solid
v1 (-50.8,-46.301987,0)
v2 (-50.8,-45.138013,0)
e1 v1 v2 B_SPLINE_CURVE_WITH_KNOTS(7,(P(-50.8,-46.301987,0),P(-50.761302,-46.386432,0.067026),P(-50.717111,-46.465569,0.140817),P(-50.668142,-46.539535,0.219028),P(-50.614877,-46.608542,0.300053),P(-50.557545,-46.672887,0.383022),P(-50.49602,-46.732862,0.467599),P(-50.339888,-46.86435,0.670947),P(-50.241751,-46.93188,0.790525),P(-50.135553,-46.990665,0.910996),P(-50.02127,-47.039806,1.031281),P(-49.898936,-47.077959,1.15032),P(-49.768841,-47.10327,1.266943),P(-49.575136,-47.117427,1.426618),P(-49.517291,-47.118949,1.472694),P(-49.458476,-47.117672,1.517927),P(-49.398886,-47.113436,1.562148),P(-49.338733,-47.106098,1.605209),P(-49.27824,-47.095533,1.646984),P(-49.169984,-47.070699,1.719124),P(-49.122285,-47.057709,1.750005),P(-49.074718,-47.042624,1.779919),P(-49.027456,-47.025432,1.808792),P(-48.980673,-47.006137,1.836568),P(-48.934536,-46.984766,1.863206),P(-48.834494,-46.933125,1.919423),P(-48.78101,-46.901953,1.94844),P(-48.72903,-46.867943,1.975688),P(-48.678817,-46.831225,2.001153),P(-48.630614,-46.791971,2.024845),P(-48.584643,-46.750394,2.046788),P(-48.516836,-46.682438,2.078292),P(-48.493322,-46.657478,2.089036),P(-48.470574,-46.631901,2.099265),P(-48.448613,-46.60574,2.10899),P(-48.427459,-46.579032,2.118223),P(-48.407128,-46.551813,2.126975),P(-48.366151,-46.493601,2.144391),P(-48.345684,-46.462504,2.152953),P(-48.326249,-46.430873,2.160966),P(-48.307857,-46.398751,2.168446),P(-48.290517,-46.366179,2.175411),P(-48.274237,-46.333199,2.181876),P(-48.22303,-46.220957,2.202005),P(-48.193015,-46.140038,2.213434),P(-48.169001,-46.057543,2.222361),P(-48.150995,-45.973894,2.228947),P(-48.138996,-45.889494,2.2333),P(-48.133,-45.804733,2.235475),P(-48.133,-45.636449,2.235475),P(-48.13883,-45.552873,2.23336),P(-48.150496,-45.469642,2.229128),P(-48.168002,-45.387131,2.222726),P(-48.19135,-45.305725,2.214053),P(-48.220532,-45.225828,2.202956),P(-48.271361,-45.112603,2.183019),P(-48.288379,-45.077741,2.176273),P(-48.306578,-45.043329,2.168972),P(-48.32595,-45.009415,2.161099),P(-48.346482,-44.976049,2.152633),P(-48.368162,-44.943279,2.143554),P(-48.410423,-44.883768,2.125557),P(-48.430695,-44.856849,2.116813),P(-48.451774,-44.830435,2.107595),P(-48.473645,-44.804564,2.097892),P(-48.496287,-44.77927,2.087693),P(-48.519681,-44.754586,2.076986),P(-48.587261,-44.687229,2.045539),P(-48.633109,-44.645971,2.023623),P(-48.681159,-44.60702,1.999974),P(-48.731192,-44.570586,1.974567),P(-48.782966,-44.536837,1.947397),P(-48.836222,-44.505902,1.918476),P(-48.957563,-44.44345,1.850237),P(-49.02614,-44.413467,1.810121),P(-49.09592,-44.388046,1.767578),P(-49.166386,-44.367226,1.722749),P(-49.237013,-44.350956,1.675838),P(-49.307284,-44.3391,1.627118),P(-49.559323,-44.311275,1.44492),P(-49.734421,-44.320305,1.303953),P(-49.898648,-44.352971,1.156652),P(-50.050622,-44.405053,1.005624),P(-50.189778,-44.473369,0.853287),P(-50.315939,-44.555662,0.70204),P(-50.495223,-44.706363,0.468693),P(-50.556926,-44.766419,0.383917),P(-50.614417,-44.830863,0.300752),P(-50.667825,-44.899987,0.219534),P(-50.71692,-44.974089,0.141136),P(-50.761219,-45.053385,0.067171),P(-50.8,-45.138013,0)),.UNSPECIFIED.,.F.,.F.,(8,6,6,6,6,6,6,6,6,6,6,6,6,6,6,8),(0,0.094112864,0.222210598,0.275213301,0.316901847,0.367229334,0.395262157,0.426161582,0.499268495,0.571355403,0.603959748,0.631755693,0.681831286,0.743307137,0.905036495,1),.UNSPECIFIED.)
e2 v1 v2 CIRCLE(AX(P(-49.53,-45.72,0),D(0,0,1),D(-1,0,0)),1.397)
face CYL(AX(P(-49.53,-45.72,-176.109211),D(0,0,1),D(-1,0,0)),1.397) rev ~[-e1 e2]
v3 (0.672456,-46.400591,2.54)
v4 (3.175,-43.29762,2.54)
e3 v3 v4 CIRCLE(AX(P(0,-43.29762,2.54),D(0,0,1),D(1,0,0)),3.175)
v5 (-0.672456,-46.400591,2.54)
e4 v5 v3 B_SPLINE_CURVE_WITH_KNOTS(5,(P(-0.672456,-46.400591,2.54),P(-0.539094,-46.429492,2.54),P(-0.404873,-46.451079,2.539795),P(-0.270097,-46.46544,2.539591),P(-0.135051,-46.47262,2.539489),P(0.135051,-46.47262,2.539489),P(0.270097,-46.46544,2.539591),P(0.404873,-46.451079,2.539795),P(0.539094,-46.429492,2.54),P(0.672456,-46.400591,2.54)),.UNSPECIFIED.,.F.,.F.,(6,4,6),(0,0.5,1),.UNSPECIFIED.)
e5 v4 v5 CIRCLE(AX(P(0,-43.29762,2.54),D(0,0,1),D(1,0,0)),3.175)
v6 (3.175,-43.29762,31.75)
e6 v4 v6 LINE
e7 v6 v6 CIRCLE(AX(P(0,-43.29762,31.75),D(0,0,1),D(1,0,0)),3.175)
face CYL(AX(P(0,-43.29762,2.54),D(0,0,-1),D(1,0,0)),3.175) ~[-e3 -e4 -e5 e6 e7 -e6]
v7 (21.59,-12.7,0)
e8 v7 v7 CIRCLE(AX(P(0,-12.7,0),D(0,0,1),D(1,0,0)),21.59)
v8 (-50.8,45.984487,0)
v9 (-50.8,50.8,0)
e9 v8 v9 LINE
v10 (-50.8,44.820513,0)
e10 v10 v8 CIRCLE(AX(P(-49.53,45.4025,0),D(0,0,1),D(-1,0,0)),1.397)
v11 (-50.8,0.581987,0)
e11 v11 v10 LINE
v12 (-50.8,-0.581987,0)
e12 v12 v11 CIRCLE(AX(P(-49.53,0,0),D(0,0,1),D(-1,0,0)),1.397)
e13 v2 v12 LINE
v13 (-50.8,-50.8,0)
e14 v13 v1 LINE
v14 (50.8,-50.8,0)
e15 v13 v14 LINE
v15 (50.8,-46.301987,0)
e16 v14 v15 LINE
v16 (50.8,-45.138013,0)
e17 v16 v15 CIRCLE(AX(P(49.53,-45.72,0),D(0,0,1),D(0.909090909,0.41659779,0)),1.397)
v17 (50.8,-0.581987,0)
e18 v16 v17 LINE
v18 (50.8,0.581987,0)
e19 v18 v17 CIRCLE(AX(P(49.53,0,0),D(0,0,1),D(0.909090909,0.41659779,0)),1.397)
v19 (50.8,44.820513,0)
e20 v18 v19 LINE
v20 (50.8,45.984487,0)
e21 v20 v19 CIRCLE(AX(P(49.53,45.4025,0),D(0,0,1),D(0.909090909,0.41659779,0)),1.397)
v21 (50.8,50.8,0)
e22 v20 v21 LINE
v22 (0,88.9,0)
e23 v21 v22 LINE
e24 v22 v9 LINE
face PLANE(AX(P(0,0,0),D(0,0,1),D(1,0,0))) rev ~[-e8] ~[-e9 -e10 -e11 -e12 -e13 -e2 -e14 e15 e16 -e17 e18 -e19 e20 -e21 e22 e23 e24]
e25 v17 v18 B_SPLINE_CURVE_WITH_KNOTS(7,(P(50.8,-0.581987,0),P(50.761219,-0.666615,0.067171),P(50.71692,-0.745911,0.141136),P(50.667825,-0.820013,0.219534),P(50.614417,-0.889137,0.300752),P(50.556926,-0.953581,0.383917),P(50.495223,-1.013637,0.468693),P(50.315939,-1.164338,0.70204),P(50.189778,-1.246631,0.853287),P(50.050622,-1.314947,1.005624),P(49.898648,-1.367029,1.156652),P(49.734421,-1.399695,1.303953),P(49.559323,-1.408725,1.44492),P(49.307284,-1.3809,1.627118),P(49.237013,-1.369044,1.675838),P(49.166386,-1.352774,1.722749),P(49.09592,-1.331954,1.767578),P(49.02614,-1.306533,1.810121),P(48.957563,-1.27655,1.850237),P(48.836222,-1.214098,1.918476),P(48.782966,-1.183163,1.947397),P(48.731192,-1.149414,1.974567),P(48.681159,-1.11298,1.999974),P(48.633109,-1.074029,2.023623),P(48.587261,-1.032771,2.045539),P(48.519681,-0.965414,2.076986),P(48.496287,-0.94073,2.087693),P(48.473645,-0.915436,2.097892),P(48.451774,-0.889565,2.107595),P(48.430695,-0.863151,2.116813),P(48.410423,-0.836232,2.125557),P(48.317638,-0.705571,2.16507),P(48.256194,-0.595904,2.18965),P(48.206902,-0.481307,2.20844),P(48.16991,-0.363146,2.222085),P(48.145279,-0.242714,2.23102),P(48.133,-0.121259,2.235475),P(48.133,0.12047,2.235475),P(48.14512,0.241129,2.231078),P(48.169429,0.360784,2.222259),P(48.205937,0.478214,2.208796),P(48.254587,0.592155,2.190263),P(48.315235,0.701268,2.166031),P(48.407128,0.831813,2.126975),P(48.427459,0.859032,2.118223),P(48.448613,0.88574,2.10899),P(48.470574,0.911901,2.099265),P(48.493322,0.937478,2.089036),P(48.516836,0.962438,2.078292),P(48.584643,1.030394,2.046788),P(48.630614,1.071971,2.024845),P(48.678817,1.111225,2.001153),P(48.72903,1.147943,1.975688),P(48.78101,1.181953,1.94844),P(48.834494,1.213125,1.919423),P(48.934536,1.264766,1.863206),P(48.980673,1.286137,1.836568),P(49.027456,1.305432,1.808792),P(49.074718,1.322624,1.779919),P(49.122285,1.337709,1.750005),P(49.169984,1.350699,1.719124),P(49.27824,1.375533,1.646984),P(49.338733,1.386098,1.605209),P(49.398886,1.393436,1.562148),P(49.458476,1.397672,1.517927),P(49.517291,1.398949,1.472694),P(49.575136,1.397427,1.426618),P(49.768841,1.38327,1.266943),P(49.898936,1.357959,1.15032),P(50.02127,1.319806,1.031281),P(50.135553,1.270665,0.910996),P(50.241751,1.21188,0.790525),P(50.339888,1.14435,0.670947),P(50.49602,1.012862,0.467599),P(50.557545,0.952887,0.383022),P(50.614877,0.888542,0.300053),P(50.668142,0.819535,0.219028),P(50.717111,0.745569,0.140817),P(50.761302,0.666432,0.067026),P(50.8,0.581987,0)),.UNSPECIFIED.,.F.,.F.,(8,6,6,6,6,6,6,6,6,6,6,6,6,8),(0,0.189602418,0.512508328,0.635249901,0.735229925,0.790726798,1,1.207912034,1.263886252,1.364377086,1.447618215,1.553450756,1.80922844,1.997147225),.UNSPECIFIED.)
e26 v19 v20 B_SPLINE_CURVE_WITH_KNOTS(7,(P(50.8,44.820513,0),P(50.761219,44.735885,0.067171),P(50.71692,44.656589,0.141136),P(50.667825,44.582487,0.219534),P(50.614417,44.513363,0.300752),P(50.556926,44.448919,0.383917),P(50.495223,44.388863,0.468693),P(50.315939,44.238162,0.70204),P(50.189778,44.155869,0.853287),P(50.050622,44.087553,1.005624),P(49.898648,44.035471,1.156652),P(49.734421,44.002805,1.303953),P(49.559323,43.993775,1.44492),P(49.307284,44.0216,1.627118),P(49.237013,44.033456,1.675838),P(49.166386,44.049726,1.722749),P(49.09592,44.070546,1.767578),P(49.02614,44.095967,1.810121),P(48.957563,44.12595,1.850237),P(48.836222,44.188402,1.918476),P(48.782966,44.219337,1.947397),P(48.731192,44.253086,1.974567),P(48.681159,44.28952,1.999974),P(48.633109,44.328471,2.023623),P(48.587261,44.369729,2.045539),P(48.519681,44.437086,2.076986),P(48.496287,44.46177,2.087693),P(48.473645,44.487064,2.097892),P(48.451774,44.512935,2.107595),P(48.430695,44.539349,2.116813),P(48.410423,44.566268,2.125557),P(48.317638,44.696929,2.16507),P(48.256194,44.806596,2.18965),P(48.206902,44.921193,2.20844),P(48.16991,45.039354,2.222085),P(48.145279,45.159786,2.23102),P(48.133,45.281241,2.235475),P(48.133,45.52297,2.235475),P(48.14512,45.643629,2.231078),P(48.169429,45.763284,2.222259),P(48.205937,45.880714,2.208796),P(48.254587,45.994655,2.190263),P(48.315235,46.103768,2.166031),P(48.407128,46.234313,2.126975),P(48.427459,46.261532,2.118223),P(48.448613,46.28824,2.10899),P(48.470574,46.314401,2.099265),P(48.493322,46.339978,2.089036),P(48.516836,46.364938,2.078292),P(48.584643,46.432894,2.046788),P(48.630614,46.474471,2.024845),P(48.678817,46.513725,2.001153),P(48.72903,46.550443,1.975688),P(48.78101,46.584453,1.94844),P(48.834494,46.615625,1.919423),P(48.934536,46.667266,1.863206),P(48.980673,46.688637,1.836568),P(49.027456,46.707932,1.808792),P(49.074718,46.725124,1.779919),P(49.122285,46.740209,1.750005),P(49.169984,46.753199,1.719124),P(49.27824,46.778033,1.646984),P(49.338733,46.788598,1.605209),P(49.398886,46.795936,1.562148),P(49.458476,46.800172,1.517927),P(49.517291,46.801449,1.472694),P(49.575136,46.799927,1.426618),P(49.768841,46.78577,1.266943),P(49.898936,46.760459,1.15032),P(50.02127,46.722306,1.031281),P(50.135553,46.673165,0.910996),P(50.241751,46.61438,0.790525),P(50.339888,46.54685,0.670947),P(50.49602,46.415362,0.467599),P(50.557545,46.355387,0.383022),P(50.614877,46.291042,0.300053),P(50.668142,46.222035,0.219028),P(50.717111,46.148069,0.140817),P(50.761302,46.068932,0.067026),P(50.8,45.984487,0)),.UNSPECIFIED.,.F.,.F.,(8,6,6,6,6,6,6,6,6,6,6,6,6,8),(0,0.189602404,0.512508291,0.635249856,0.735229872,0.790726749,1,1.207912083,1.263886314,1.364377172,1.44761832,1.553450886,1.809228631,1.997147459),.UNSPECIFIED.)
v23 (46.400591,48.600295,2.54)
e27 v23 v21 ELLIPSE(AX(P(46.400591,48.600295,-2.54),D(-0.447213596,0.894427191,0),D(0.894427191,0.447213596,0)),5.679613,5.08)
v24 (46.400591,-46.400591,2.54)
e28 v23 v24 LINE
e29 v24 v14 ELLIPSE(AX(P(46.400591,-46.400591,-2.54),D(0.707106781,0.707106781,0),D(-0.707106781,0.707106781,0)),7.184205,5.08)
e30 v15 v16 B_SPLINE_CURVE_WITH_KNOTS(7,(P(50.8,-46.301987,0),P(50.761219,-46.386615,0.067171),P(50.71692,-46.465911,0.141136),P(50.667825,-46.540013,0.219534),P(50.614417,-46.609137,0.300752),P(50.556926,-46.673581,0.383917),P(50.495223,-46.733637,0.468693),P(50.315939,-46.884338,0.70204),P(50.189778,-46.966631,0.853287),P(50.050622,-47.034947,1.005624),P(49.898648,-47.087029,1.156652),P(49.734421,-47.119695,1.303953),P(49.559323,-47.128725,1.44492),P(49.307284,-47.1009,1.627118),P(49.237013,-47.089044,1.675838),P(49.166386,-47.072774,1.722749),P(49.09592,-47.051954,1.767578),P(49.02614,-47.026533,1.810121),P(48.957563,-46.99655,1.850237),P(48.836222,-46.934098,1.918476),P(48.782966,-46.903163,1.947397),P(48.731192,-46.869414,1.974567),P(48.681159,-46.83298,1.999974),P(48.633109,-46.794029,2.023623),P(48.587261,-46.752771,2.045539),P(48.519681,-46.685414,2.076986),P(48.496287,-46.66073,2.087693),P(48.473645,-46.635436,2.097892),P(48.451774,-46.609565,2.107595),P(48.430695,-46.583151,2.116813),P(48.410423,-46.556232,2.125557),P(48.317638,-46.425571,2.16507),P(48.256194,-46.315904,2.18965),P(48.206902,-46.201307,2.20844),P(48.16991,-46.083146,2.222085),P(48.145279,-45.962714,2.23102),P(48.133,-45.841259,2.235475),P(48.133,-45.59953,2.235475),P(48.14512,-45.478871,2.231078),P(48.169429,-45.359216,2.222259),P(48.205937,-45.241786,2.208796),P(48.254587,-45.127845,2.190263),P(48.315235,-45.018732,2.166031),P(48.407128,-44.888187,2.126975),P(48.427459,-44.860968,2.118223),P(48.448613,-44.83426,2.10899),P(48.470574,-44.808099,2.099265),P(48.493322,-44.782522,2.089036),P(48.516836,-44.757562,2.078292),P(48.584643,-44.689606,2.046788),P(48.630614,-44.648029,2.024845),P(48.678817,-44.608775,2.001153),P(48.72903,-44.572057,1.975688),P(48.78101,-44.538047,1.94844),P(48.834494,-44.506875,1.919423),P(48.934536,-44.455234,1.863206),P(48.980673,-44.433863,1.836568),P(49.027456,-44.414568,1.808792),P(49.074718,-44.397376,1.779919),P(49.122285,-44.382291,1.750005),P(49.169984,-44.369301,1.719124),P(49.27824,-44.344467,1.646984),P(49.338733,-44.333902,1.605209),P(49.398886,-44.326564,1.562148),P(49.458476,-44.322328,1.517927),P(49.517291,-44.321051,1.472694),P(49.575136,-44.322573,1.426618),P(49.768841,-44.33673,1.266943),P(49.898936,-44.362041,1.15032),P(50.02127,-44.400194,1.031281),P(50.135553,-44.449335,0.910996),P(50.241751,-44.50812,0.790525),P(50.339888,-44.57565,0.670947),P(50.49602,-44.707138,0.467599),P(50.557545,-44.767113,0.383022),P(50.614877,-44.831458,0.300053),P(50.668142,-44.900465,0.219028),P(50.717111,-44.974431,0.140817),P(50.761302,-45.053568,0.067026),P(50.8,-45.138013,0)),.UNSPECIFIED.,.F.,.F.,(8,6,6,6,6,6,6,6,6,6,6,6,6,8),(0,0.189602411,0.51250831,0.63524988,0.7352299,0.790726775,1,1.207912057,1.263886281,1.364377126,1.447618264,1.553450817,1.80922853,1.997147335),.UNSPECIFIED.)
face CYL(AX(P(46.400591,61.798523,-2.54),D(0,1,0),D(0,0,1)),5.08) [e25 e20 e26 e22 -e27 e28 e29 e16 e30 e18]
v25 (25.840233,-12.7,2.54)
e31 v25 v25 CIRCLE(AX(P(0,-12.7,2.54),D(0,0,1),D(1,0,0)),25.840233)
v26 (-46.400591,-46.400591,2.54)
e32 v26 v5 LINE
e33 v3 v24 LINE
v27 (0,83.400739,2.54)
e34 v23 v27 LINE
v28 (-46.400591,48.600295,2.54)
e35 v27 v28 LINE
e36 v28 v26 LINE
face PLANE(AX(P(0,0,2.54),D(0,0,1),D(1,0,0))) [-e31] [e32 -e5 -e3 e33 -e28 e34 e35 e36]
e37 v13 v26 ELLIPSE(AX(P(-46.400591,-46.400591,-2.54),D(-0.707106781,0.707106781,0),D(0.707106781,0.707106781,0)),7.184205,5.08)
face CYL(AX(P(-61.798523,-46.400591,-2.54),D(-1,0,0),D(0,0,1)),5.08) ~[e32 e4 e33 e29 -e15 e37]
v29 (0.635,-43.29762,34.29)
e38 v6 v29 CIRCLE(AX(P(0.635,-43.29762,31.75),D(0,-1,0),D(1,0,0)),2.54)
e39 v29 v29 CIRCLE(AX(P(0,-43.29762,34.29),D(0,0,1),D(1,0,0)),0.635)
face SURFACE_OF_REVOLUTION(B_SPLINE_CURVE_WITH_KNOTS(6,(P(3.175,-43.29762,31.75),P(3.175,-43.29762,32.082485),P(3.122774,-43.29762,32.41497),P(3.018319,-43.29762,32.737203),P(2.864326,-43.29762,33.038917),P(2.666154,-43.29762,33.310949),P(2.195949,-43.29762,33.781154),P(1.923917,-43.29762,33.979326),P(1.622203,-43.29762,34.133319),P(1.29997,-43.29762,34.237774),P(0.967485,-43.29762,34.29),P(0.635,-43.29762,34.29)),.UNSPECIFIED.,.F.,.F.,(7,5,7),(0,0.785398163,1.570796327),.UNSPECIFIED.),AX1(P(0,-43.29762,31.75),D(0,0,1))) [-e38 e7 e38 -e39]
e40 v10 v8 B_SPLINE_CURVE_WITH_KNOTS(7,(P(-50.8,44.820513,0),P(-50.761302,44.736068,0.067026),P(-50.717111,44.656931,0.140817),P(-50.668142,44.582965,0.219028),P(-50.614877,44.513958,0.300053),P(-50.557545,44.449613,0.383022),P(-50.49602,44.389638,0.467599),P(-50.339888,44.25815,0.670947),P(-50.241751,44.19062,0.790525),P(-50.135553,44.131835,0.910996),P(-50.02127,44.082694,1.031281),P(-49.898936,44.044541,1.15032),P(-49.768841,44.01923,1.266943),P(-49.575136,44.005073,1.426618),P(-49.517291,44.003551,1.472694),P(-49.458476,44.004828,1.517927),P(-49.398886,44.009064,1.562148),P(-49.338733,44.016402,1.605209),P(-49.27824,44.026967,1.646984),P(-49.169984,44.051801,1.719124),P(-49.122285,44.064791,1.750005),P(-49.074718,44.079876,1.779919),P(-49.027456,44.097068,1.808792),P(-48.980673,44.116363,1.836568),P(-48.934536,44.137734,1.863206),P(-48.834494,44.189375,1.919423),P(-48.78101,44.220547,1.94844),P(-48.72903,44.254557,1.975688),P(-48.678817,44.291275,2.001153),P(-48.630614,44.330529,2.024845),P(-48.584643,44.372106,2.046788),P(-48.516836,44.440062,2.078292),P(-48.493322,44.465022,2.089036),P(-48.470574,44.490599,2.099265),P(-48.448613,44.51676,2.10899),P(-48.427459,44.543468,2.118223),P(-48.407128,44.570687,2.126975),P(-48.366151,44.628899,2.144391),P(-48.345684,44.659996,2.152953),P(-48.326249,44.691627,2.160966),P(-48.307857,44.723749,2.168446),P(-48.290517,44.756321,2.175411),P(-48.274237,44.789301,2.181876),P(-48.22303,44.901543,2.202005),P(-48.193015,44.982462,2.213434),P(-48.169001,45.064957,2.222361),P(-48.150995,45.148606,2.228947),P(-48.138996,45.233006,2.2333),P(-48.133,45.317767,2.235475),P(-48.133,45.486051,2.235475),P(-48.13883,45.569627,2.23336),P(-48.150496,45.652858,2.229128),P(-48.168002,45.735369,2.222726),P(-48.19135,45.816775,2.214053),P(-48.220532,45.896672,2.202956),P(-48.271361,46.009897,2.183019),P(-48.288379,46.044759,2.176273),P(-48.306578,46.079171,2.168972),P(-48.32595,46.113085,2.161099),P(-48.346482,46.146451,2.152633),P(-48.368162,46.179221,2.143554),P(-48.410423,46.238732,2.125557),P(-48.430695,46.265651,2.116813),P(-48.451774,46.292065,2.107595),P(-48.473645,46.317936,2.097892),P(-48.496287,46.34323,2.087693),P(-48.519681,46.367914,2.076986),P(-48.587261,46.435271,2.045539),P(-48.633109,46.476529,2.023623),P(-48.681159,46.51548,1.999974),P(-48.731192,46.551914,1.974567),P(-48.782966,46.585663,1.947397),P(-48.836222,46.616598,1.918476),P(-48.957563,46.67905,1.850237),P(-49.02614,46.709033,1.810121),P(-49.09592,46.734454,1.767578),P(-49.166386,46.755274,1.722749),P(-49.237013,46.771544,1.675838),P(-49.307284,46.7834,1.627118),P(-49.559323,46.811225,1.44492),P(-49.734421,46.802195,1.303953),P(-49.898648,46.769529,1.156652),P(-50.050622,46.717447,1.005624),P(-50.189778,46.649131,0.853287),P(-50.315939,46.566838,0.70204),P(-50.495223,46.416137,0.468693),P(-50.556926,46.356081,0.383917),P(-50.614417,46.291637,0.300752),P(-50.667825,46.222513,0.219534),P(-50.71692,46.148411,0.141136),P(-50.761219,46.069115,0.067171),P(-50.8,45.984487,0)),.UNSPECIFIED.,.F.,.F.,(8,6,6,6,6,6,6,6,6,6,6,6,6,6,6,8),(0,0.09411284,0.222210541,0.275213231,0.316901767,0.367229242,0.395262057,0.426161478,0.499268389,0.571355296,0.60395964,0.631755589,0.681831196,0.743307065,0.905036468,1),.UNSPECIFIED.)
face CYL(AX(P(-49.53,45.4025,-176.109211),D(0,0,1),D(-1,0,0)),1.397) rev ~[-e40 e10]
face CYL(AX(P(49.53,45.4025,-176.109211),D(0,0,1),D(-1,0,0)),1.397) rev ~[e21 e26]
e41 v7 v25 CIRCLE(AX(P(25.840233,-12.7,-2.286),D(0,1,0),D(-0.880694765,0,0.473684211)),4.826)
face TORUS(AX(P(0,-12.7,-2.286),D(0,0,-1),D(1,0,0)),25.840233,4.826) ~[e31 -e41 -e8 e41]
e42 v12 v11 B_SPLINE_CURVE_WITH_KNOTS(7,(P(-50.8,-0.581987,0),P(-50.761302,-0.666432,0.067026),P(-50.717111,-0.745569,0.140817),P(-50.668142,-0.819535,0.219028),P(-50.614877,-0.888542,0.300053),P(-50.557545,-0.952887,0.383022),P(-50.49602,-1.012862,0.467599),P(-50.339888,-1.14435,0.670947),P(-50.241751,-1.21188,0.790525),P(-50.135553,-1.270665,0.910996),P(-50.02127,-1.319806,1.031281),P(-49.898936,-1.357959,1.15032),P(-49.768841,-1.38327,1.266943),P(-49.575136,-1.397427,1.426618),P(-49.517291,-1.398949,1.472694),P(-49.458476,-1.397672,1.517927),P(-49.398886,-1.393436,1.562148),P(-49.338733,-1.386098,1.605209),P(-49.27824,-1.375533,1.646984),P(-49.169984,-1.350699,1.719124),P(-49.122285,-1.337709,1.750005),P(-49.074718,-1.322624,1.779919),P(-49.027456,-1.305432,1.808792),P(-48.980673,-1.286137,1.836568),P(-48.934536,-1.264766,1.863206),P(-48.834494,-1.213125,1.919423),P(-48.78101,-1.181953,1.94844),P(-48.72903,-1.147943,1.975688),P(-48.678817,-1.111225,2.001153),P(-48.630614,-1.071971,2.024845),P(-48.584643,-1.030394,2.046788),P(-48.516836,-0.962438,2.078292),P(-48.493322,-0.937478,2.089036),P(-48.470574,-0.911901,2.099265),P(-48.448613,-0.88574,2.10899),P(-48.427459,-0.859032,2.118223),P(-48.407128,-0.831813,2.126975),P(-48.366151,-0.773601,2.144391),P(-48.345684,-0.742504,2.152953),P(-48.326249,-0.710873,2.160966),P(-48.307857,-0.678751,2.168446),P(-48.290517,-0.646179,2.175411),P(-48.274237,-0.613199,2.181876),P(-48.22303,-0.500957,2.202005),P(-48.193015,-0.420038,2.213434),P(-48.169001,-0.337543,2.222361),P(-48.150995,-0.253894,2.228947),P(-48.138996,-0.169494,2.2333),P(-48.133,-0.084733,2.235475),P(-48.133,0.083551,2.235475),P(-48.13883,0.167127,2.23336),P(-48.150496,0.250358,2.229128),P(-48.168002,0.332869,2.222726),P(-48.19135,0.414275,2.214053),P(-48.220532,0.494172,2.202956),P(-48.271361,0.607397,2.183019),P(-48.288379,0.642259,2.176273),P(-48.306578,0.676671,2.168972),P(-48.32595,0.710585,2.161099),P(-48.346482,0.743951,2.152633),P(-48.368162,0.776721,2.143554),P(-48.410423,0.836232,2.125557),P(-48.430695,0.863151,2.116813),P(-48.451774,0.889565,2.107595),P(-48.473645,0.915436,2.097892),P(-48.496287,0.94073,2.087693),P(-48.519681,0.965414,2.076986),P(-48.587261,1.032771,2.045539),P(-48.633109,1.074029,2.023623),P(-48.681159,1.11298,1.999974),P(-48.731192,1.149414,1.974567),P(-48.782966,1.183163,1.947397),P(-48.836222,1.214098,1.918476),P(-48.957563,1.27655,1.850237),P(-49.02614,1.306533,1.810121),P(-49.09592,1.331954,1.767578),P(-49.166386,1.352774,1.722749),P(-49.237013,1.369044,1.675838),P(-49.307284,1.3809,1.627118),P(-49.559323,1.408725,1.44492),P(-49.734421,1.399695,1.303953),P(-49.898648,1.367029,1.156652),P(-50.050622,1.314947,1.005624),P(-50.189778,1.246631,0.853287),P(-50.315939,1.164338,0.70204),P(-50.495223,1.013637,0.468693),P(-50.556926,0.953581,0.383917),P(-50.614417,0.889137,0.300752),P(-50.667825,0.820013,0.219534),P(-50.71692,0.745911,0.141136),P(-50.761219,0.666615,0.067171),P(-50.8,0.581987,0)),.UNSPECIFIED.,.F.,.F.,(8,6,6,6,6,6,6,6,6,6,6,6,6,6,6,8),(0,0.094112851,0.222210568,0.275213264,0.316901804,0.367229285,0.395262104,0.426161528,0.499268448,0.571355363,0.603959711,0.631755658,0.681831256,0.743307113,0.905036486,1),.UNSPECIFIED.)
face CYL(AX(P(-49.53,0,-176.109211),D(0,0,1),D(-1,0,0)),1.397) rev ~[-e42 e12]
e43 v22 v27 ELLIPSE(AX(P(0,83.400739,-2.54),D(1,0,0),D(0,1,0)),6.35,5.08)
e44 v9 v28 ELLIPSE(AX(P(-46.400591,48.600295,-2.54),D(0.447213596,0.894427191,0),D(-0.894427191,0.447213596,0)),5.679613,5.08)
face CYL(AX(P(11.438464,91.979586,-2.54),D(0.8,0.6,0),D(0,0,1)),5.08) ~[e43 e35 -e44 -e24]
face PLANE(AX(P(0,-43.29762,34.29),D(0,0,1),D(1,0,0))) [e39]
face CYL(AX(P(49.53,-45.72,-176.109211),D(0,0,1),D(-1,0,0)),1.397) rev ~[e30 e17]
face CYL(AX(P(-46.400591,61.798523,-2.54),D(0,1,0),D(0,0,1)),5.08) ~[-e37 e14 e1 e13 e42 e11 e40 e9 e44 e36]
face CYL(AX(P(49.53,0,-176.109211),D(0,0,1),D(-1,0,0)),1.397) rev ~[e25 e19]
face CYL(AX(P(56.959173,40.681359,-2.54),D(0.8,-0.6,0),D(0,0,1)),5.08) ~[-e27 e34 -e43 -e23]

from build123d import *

# Parameters (mm, degrees)
F0_W         = 101.6
F0_H         = 101.6
F0_R         = 21.59
F1_DEPTH     = 2.54
F3_R         = 3.175
F4_DEPTH     = 31.75
F5_R         = 2.54
F6_T1_DEPTH  = 123.5970452561
F6_T3_DEPTH  = 85.4970452561
F6_T5_DEPTH  = 85.4970452561
F6_T10_DEPTH = 123.5970452561
F6_S11_R     = 3.175
F6_T12_DEPTH = 63
F8_D         = 2.794


# Not quite as in the source:
# - a fillet or chamfer that OpenCascade refuses, or shapes differently, is made with other operations: its cross-section is extruded or revolved along the edge and cut away or added


with BuildPart() as f1:
    # F0 (on Top) → F1 (new body)
    with BuildSketch(Plane.XY):
        Rectangle(F0_W, F0_H)
        with Locations((0, -12.7)):
            Circle(F0_R, mode=Mode.SUBTRACT)
        Polygon((-50.8, 50.8), (50.8, 50.8), (0, 88.9), align=None)
    extrude(amount=F1_DEPTH)

    # F2: fillet of radius 4.826 on 1 edges, made by hand

    # F2_s1 → F2_t2 (revolve, cut)
    with BuildSketch(Plane.XZ.offset(12.7)):
        with BuildLine():
            ThreePointArc((21.59, 0), (23.3645471712, 1.8566146333), (25.8402329348, 2.54))
            Line((25.8402329348, 2.54), (21.59, 2.54))
            Line((21.59, 2.54), (21.59, 0))
        make_face()
    revolve(axis=Axis((0, -12.7, 2.54), (0, 0, 1)), mode=Mode.SUBTRACT)

    # F3 (on face) → F4 (join)
    with BuildSketch(Plane.XY.offset(2.54)):
        with Locations((0, -43.2976202148)):
            Circle(F3_R)
    extrude(amount=F4_DEPTH)

    # F5
    f5_edges = [f1.edges().sort_by_distance(p)[0] for p in [
        (-3.175, -43.29762, 34.29),
    ]]
    fillet(f5_edges, radius=F5_R)

    # F6: fillet of radius 5.08 on 5 edges, made by hand

    # F6_s2 → F6_t1 (cut)
    with BuildSketch(Plane.XZ.offset(-61.7985226281)):
        with BuildLine():
            ThreePointArc((46.4005909488, 2.54), (48.9405909488, 1.8594090512), (50.8, 0))
            Line((50.8, 0), (50.8, 2.54))
            Line((50.8, 2.54), (46.4005909488, 2.54))
        make_face()
        with BuildLine():
            ThreePointArc((-46.4005909488, 2.54), (-48.9405909488, 1.8594090512), (-50.8, 0))
            Line((-50.8, 0), (-50.8, 2.54))
            Line((-50.8, 2.54), (-46.4005909488, 2.54))
        make_face()
    extrude(amount=F6_T1_DEPTH, mode=Mode.SUBTRACT)

    # F6_s4 → F6_t3 (cut)
    with BuildSketch(Plane(origin=(51.4708181025, 38.6031135768, 0), x_dir=(0, 0, 1), z_dir=(-0.8, -0.6, 0))):
        with BuildLine():
            ThreePointArc((2.54, 66.7205909488), (1.8594090512, 69.2605909488), (0, 71.12))
            Line((0, 71.12), (2.54, 71.12))
            Line((2.54, 71.12), (2.54, 66.7205909488))
        make_face()
    extrude(amount=F6_T3_DEPTH, mode=Mode.SUBTRACT)

    # F6_s6 → F6_t5 (cut)
    with BuildSketch(Plane(origin=(16.9268181025, -12.6951135768, 0), x_dir=(0, 0, 1), z_dir=(-0.8, 0.6, 0))):
        with BuildLine():
            ThreePointArc((2.54, 66.7205909488), (1.8594090512, 69.2605909488), (0, 71.12))
            Line((0, 71.12), (2.54, 71.12))
            Line((2.54, 71.12), (2.54, 66.7205909488))
        make_face()
    extrude(amount=F6_T5_DEPTH, mode=Mode.SUBTRACT)


with BuildPart() as f6_tool8:
    # F6_s9 → F6_t10 (new body)
    with BuildSketch(Plane.YZ.offset(-61.7985226281)):
        with BuildLine():
            ThreePointArc((-46.4005909488, 2.54), (-48.9405909488, 1.8594090512), (-50.8, 0))
            Line((-50.8, 0), (-50.8, 2.54))
            Line((-50.8, 2.54), (-46.4005909488, 2.54))
        make_face()
    extrude(amount=F6_T10_DEPTH)

    # F6_s11 → F6_t12 (cut, symmetric)
    with BuildSketch(Plane.XY.offset(1.3)):
        with Locations((0, -43.2976202148)):
            Circle(F6_S11_R)
    extrude(amount=F6_T12_DEPTH, both=True, mode=Mode.SUBTRACT)


with BuildPart() as f1_1:
    add(f1.part)

    # F6_t7: cut F6_tool8
    add(f6_tool8.part, mode=Mode.SUBTRACT)

    # F8 (through all)
    with Locations(Plane(origin=(0, 0, 0), x_dir=(1, 0, 0), z_dir=(0, 0, -1))):
        with Locations((-49.53, -45.4025), (-49.53, 0), (-49.53, 45.72), (49.53, 45.72), (49.53, 0), (49.53, -45.4025)):
            Hole(F8_D / 2)


solid = f1_1.part
